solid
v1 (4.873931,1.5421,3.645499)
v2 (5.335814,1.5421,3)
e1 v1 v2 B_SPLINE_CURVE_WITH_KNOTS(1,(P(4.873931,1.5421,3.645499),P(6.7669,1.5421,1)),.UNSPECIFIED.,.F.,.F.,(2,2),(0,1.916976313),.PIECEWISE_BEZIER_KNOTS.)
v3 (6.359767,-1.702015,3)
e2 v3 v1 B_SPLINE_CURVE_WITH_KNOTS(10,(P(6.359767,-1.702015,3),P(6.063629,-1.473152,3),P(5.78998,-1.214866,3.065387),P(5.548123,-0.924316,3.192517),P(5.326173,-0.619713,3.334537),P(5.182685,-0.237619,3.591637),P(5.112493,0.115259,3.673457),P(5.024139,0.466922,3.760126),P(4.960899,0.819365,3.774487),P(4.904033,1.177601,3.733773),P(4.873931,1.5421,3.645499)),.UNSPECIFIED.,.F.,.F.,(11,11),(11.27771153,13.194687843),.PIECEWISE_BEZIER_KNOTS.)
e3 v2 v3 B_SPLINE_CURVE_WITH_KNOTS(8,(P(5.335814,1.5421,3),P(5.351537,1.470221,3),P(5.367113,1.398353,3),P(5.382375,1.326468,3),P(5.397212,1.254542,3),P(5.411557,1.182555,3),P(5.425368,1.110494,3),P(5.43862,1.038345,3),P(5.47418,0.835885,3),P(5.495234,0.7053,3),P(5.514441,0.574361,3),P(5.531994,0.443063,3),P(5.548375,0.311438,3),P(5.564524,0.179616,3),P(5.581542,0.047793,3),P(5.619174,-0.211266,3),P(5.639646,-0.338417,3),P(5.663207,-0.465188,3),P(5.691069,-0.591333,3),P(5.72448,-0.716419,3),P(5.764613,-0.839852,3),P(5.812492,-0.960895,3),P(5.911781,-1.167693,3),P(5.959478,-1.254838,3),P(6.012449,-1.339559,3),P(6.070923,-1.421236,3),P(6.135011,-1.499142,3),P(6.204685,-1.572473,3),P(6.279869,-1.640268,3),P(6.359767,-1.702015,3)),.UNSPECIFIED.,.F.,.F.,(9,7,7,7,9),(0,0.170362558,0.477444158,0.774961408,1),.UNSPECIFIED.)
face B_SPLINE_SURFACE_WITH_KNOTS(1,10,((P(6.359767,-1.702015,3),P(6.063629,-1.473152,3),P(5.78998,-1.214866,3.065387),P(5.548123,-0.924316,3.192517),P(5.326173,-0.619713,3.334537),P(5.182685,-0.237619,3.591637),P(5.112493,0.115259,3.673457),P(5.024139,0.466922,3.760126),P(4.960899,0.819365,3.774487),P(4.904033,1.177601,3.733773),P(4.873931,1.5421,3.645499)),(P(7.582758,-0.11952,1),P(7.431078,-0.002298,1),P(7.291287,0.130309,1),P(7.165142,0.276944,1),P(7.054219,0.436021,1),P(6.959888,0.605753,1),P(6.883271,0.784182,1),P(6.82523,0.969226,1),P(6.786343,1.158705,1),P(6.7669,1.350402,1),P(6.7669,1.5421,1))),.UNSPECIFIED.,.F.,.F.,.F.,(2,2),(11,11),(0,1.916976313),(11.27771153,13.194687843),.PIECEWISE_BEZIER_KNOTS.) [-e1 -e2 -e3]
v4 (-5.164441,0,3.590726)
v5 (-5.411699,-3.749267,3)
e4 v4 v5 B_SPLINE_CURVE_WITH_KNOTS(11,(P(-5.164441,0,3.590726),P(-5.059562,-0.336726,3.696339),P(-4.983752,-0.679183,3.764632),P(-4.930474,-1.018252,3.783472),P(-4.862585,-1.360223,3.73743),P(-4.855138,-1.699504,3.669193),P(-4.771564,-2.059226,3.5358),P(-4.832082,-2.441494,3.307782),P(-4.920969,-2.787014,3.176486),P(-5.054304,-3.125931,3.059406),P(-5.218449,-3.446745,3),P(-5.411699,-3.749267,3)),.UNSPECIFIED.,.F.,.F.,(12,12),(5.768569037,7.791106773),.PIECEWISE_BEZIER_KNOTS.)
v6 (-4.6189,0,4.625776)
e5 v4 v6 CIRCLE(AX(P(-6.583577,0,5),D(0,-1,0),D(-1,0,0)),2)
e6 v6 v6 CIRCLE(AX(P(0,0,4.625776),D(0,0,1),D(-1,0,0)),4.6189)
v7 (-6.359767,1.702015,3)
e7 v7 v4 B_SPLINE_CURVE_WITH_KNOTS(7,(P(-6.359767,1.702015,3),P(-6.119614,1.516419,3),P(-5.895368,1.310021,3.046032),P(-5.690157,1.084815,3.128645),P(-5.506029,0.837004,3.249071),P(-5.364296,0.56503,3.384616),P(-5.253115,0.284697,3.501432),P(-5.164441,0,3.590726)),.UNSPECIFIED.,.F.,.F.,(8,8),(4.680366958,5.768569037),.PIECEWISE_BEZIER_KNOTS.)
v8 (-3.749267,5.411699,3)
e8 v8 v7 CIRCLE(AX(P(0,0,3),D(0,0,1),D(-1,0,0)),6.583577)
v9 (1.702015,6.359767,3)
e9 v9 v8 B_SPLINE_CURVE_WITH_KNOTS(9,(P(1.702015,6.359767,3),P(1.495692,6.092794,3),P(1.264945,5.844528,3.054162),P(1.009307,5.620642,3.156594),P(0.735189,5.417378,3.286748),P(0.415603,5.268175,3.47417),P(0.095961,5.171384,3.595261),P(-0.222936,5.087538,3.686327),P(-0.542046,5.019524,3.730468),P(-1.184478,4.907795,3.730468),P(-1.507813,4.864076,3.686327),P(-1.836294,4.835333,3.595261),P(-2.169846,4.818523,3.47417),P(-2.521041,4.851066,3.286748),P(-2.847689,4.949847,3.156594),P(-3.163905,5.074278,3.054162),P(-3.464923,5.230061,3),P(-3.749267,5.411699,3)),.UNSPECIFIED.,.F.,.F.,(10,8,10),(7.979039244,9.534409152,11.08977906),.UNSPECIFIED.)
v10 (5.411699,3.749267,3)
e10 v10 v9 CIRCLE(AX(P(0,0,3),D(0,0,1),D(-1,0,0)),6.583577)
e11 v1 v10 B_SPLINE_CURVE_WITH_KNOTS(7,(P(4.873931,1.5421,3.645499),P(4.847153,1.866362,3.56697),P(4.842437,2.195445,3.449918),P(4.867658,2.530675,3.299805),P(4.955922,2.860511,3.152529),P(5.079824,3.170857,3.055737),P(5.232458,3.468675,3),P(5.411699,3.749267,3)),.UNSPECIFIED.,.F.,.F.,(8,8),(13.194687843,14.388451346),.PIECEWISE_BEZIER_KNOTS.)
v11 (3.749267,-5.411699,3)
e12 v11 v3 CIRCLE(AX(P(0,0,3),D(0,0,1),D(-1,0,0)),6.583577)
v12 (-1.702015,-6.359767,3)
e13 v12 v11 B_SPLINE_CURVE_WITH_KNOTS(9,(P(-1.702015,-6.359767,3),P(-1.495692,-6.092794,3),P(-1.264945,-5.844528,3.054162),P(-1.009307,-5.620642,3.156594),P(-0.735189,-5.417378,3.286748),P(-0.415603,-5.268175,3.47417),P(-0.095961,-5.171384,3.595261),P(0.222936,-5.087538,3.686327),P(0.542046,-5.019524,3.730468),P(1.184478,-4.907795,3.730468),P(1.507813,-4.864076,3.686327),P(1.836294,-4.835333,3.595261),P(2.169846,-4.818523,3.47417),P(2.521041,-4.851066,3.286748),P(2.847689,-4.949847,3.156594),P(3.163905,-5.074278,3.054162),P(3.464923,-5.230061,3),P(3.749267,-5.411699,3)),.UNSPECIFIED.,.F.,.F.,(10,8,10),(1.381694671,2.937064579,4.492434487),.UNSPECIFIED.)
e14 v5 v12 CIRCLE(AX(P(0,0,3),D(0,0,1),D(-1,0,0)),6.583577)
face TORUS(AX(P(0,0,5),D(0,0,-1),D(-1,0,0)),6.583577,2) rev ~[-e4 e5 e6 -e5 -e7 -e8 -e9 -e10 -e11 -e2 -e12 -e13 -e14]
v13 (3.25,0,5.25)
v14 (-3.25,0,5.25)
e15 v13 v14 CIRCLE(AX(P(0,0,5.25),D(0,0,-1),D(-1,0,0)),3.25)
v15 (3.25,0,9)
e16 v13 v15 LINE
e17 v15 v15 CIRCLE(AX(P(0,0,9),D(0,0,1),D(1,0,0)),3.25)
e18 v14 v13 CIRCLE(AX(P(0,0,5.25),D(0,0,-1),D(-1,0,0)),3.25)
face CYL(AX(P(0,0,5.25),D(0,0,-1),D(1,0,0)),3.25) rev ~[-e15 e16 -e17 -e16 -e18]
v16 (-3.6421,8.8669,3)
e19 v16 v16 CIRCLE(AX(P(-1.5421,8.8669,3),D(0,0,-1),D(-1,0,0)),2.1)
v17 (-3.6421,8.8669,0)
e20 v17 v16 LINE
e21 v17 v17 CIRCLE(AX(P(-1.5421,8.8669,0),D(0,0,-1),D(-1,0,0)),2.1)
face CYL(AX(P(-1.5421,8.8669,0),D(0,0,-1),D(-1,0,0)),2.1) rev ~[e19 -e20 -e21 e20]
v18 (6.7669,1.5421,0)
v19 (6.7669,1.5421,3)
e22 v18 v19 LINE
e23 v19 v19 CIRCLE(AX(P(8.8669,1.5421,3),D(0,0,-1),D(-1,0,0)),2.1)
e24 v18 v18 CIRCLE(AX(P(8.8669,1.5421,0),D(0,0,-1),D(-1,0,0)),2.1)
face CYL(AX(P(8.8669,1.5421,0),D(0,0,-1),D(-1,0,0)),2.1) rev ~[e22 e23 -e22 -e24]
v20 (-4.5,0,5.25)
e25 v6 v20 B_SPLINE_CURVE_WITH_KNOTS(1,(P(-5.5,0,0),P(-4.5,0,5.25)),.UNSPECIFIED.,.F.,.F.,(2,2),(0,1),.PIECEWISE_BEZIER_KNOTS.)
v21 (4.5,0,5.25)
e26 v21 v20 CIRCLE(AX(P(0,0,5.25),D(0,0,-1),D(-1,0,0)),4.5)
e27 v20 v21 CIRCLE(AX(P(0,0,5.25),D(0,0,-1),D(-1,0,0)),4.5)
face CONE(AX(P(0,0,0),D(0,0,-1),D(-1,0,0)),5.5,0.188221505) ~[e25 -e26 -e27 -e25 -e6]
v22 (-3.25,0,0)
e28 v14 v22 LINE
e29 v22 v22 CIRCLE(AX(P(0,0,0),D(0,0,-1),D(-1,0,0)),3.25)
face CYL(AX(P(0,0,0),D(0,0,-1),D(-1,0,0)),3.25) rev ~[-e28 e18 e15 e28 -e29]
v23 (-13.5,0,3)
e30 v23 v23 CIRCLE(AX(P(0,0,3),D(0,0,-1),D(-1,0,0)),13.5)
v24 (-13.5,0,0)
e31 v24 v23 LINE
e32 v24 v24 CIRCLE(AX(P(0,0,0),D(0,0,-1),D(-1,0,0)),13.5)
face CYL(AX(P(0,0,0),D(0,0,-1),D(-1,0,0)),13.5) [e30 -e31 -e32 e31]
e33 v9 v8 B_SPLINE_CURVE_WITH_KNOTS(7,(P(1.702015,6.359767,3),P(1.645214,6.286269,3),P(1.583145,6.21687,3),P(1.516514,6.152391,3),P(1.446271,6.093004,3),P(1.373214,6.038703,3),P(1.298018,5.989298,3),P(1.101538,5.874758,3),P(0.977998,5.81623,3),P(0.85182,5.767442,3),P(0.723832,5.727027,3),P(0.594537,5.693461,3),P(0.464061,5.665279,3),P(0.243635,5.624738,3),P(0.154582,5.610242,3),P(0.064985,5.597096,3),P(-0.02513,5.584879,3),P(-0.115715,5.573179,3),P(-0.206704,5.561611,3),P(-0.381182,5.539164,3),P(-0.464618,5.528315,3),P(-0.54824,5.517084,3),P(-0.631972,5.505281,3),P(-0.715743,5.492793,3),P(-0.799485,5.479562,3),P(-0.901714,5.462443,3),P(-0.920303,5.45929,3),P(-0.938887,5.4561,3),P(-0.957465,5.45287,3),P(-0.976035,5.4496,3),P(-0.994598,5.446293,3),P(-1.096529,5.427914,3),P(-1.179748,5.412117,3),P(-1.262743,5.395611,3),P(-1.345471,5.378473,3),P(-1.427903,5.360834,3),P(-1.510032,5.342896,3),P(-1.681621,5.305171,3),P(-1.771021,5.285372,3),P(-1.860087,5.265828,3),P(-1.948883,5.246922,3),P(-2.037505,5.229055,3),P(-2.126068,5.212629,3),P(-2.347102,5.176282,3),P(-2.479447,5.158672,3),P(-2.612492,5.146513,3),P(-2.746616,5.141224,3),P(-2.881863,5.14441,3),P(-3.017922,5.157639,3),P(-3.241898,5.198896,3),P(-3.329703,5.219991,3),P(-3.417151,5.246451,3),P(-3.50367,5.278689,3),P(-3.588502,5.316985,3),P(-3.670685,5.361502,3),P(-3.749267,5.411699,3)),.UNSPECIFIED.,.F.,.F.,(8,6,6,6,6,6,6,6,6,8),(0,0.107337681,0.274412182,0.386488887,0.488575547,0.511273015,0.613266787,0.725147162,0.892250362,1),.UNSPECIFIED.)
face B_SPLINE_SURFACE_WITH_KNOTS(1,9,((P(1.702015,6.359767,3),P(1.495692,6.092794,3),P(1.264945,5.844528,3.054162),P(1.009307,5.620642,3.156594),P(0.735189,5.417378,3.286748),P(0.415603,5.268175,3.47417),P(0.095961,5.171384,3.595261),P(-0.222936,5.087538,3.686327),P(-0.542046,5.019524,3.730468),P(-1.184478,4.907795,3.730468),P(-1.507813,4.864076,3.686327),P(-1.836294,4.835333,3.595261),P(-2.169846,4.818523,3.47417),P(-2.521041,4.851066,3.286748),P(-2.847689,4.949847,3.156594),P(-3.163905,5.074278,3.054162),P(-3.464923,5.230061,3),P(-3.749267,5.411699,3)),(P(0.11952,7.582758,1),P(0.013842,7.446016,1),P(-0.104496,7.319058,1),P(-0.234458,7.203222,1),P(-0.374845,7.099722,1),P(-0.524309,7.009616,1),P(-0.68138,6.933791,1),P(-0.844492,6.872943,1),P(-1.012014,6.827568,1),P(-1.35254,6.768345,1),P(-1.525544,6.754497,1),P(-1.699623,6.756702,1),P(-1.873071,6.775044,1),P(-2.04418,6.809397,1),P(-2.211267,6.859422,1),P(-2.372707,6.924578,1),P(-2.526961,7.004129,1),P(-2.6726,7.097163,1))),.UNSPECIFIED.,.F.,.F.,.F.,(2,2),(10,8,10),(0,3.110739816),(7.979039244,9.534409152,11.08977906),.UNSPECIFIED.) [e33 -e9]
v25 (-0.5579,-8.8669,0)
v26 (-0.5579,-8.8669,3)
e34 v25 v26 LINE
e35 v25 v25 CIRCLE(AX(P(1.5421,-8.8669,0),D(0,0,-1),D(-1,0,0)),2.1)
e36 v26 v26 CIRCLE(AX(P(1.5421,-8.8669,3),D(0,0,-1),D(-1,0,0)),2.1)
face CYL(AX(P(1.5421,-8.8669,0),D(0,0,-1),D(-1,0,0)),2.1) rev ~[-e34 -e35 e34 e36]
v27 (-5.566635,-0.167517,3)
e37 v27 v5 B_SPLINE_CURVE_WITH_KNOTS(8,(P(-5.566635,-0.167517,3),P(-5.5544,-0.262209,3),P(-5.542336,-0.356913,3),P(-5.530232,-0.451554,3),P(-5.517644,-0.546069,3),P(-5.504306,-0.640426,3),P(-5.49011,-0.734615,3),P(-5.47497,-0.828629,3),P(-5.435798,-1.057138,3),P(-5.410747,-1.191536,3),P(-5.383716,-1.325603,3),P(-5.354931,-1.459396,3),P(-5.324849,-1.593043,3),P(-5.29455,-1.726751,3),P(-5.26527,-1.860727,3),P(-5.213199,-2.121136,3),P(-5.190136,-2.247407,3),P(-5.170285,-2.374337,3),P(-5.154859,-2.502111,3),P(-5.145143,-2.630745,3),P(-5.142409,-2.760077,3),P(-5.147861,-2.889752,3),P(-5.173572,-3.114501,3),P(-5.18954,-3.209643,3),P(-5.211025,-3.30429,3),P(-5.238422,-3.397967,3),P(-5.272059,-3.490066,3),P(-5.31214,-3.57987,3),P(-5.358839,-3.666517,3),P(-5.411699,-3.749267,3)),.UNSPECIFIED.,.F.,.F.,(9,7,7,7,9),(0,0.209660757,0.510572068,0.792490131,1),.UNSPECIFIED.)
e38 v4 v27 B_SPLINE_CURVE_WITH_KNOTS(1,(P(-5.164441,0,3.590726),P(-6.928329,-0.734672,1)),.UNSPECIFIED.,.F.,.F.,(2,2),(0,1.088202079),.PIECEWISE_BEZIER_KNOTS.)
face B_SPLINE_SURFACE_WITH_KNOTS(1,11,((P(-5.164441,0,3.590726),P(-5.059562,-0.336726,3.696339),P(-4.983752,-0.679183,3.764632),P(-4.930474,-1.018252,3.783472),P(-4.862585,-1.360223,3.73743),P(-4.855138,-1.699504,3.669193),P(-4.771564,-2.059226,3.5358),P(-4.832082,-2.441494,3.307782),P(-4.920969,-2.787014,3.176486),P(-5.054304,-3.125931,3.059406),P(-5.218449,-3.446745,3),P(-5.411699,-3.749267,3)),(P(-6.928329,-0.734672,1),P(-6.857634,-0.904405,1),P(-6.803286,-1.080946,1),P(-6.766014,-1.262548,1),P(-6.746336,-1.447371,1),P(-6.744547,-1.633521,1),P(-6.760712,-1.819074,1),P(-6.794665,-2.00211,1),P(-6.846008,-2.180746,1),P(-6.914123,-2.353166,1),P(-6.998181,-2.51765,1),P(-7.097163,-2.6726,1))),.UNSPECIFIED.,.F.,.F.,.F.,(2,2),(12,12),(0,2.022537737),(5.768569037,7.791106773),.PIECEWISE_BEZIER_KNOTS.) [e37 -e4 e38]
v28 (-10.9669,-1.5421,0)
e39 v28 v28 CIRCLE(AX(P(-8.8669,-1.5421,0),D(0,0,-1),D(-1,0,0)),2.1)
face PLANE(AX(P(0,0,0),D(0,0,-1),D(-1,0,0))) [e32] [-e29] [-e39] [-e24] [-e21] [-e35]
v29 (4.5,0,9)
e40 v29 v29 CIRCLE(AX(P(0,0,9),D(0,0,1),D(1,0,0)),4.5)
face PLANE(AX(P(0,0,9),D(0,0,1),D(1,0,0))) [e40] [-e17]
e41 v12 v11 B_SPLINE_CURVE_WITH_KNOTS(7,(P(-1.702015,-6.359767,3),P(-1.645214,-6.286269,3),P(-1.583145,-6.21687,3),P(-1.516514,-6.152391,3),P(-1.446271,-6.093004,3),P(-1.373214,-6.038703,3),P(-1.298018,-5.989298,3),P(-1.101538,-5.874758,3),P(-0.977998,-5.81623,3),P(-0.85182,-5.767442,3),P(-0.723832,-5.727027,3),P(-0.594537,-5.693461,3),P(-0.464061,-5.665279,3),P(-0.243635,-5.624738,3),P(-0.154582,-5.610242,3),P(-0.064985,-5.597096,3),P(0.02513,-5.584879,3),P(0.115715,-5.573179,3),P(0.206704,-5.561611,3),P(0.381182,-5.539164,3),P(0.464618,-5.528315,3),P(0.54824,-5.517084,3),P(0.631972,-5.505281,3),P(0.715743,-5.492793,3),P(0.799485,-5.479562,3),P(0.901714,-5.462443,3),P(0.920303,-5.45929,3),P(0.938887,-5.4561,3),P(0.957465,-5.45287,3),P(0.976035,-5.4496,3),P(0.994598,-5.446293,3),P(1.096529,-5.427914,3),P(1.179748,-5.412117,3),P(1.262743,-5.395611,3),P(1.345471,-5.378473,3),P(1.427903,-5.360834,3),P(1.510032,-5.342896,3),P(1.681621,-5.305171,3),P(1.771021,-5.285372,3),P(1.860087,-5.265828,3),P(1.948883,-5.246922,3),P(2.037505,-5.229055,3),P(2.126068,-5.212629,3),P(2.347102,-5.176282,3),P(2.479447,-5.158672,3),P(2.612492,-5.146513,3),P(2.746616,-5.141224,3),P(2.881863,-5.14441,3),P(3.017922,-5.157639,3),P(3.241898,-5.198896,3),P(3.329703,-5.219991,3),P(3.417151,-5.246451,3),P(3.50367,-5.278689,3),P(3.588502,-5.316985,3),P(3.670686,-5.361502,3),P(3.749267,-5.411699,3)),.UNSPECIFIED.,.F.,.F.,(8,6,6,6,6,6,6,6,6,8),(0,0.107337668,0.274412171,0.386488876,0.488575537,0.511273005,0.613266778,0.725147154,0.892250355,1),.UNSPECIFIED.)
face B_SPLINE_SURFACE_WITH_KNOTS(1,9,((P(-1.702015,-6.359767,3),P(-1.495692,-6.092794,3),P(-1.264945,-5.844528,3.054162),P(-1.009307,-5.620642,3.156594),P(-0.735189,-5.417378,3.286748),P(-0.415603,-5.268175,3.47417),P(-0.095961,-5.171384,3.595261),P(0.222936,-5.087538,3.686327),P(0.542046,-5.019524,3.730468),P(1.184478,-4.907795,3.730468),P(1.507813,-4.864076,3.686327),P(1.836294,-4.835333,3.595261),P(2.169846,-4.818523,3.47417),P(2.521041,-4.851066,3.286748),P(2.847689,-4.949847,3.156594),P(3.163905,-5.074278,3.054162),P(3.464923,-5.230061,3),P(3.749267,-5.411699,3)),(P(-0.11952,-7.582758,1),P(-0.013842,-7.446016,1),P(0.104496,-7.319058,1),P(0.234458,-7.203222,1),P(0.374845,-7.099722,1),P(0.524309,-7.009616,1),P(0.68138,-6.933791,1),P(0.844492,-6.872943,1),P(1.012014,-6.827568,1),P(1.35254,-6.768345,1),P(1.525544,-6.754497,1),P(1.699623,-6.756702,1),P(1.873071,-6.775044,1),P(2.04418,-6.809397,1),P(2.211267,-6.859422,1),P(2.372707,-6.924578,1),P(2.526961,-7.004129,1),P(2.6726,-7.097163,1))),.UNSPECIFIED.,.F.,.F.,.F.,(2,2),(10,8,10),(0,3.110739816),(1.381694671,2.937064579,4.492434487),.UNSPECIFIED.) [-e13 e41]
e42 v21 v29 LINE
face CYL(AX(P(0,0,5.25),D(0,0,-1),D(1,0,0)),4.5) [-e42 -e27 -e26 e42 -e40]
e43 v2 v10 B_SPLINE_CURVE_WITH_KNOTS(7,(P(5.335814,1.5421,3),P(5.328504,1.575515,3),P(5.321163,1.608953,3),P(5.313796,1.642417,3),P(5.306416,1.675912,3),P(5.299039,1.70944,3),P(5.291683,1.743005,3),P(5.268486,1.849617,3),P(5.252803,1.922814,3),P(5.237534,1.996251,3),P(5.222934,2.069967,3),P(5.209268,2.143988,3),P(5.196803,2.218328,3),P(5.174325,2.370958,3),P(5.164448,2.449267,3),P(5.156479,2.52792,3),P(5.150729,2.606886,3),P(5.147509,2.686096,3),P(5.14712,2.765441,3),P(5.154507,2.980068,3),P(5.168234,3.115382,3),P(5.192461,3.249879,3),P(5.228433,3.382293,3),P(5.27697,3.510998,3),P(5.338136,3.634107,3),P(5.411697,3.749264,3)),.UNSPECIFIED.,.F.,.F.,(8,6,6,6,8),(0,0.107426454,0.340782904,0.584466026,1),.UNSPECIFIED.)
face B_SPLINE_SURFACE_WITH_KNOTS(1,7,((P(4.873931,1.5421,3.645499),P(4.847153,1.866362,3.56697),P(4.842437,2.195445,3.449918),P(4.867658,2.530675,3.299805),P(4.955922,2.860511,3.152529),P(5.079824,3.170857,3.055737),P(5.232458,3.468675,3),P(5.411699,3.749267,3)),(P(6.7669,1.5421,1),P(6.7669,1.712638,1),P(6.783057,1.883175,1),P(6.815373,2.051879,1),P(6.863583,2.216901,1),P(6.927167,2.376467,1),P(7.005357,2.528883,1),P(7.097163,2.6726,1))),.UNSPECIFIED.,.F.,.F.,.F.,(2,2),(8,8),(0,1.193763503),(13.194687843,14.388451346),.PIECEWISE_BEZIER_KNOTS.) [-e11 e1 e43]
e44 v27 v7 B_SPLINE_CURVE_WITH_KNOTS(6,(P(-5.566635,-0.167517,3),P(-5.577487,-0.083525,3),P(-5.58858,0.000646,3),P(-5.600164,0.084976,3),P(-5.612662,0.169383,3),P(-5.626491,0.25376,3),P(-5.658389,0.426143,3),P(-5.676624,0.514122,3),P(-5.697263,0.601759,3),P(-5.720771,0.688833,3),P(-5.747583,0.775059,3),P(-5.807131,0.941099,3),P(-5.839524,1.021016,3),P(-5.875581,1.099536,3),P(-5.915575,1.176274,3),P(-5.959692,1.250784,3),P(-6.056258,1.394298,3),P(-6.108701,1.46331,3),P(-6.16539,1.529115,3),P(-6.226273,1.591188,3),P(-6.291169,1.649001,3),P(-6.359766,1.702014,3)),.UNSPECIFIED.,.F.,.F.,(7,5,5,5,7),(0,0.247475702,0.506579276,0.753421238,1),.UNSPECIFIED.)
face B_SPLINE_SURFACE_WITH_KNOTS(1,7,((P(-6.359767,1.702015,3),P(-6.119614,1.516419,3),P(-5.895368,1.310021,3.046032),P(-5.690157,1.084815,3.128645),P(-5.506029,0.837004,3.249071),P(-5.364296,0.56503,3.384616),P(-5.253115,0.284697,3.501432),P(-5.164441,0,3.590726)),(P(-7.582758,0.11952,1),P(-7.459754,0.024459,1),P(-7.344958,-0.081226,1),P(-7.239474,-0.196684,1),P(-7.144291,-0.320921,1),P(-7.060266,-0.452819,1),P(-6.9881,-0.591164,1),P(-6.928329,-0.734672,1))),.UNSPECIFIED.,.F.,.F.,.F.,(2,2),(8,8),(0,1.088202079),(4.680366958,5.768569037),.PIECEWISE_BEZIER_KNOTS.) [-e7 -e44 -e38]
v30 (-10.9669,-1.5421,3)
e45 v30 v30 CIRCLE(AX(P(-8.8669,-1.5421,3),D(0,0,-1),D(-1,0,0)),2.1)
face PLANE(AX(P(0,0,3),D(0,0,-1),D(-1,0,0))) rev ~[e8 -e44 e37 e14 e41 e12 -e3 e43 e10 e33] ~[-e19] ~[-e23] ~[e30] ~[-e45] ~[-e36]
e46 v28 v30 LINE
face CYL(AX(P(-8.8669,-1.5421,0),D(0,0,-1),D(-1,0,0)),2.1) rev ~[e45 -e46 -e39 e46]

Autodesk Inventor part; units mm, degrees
ref_plane "YZ Plane" through (0, 0, 0) normal (1, 0, 0) x (0, 1, 0)
ref_plane "XZ Plane" through (0, 0, 0) normal (0, 1, 0) x (-1, 0, 0)
ref_plane "XY Plane" through (0, 0, 0) normal (0, 0, 1) x (1, 0, 0)
sketch "Эскиз1" plane through (0, 0, 0) normal (0, 0, 1) x (1, 0, 0)
  circle A0 centre (0, 0) radius 3.25
  circle A1 centre (0, 0) radius 4.5
  dimension "d0" = 6.5
  dimension "d1" = 9
extrude "Выдавливание1" add sketch "Эскиз1" along normal blind 5.25
sketch "Эскиз2" plane through (0, 0, 0) normal (0, 0, -1) x (-1, 0, 0)
  circle A0 centre (0, 0) radius 5.5
  dimension "d4" = 11
loft "Лофт1" add profiles "Эскиз2" section 2 edges at (-4.5, 0, 5.25)
sketch "Эскиз4" plane through (0, 0, 0) normal (0, 0, -1) x (-1, 0, 0)
  circle A0 centre (0, 0) radius 3.25
  dimension "d10" = 6.5
extrude "Выдавливание2" cut sketch "Эскиз4" against normal through all
sketch "Эскиз5" plane through (0, 0, 0) normal (0, 0, -1) x (-1, 0, 0)
  circle A0 centre (-8.8669, 1.5421) radius 2.1 projected
  circle A1 centre (-1.5421, -8.8669) radius 2.1 projected
  circle A2 centre (1.5421, 8.8669) radius 2.1 projected
  circle A3 centre (8.8669, -1.5421) radius 2.1 projected
  circle A4 centre (0, 0) radius 13.5
  circle A5 centre (0, 0) radius 3.25 projected
  dimension "d13" = 27
extrude "Выдавливание3" add sketch "Эскиз5" against normal blind 3
fillet "Сопряжение1" radius 2 1 edges at (4.9286, 0, 3)
chamfer "Фаска1" distance 2 angle 45 4 edges at (0.5579, 8.8669, 3) (10.9669, 1.5421, 3) (-6.7669, -1.5421, 3) (3.6421, -8.8669, 3)
sketch "Эскиз6" plane through (0, 0, 0) normal (0, 0, -1) x (-1, 0, 0)
  circle A0 centre (0, 0) radius 13.5 projected
  circle A1 centre (8.8669, -1.5421) radius 2.1 projected
  circle A2 centre (1.5421, 8.8669) radius 2.1 projected
  circle A3 centre (-1.5421, -8.8669) radius 2.1 projected
  circle A4 centre (-8.8669, 1.5421) radius 2.1 projected
  circle A5 centre (0, 0) radius 3.25 projected
extrude "Выдавливание4" add sketch "Эскиз6" against normal blind 3
sketch "Эскиз8" plane through (0, 0, 3) normal (0, 0, 1) x (1, 0, 0)
  point P0 (0, 0)
sketch "Эскиз9" plane through (0, 0, 5.25) normal (0, 0, 1) x (1, 0, 0)
  circle A0 centre (0, 0) radius 4.5
  circle A1 centre (0, 0) radius 3.25
extrude "Выдавливание6" add sketch "Эскиз9" along normal blind 3.75
properties part number "втулка для крепл 3" material "Пластик ПЭТ"
